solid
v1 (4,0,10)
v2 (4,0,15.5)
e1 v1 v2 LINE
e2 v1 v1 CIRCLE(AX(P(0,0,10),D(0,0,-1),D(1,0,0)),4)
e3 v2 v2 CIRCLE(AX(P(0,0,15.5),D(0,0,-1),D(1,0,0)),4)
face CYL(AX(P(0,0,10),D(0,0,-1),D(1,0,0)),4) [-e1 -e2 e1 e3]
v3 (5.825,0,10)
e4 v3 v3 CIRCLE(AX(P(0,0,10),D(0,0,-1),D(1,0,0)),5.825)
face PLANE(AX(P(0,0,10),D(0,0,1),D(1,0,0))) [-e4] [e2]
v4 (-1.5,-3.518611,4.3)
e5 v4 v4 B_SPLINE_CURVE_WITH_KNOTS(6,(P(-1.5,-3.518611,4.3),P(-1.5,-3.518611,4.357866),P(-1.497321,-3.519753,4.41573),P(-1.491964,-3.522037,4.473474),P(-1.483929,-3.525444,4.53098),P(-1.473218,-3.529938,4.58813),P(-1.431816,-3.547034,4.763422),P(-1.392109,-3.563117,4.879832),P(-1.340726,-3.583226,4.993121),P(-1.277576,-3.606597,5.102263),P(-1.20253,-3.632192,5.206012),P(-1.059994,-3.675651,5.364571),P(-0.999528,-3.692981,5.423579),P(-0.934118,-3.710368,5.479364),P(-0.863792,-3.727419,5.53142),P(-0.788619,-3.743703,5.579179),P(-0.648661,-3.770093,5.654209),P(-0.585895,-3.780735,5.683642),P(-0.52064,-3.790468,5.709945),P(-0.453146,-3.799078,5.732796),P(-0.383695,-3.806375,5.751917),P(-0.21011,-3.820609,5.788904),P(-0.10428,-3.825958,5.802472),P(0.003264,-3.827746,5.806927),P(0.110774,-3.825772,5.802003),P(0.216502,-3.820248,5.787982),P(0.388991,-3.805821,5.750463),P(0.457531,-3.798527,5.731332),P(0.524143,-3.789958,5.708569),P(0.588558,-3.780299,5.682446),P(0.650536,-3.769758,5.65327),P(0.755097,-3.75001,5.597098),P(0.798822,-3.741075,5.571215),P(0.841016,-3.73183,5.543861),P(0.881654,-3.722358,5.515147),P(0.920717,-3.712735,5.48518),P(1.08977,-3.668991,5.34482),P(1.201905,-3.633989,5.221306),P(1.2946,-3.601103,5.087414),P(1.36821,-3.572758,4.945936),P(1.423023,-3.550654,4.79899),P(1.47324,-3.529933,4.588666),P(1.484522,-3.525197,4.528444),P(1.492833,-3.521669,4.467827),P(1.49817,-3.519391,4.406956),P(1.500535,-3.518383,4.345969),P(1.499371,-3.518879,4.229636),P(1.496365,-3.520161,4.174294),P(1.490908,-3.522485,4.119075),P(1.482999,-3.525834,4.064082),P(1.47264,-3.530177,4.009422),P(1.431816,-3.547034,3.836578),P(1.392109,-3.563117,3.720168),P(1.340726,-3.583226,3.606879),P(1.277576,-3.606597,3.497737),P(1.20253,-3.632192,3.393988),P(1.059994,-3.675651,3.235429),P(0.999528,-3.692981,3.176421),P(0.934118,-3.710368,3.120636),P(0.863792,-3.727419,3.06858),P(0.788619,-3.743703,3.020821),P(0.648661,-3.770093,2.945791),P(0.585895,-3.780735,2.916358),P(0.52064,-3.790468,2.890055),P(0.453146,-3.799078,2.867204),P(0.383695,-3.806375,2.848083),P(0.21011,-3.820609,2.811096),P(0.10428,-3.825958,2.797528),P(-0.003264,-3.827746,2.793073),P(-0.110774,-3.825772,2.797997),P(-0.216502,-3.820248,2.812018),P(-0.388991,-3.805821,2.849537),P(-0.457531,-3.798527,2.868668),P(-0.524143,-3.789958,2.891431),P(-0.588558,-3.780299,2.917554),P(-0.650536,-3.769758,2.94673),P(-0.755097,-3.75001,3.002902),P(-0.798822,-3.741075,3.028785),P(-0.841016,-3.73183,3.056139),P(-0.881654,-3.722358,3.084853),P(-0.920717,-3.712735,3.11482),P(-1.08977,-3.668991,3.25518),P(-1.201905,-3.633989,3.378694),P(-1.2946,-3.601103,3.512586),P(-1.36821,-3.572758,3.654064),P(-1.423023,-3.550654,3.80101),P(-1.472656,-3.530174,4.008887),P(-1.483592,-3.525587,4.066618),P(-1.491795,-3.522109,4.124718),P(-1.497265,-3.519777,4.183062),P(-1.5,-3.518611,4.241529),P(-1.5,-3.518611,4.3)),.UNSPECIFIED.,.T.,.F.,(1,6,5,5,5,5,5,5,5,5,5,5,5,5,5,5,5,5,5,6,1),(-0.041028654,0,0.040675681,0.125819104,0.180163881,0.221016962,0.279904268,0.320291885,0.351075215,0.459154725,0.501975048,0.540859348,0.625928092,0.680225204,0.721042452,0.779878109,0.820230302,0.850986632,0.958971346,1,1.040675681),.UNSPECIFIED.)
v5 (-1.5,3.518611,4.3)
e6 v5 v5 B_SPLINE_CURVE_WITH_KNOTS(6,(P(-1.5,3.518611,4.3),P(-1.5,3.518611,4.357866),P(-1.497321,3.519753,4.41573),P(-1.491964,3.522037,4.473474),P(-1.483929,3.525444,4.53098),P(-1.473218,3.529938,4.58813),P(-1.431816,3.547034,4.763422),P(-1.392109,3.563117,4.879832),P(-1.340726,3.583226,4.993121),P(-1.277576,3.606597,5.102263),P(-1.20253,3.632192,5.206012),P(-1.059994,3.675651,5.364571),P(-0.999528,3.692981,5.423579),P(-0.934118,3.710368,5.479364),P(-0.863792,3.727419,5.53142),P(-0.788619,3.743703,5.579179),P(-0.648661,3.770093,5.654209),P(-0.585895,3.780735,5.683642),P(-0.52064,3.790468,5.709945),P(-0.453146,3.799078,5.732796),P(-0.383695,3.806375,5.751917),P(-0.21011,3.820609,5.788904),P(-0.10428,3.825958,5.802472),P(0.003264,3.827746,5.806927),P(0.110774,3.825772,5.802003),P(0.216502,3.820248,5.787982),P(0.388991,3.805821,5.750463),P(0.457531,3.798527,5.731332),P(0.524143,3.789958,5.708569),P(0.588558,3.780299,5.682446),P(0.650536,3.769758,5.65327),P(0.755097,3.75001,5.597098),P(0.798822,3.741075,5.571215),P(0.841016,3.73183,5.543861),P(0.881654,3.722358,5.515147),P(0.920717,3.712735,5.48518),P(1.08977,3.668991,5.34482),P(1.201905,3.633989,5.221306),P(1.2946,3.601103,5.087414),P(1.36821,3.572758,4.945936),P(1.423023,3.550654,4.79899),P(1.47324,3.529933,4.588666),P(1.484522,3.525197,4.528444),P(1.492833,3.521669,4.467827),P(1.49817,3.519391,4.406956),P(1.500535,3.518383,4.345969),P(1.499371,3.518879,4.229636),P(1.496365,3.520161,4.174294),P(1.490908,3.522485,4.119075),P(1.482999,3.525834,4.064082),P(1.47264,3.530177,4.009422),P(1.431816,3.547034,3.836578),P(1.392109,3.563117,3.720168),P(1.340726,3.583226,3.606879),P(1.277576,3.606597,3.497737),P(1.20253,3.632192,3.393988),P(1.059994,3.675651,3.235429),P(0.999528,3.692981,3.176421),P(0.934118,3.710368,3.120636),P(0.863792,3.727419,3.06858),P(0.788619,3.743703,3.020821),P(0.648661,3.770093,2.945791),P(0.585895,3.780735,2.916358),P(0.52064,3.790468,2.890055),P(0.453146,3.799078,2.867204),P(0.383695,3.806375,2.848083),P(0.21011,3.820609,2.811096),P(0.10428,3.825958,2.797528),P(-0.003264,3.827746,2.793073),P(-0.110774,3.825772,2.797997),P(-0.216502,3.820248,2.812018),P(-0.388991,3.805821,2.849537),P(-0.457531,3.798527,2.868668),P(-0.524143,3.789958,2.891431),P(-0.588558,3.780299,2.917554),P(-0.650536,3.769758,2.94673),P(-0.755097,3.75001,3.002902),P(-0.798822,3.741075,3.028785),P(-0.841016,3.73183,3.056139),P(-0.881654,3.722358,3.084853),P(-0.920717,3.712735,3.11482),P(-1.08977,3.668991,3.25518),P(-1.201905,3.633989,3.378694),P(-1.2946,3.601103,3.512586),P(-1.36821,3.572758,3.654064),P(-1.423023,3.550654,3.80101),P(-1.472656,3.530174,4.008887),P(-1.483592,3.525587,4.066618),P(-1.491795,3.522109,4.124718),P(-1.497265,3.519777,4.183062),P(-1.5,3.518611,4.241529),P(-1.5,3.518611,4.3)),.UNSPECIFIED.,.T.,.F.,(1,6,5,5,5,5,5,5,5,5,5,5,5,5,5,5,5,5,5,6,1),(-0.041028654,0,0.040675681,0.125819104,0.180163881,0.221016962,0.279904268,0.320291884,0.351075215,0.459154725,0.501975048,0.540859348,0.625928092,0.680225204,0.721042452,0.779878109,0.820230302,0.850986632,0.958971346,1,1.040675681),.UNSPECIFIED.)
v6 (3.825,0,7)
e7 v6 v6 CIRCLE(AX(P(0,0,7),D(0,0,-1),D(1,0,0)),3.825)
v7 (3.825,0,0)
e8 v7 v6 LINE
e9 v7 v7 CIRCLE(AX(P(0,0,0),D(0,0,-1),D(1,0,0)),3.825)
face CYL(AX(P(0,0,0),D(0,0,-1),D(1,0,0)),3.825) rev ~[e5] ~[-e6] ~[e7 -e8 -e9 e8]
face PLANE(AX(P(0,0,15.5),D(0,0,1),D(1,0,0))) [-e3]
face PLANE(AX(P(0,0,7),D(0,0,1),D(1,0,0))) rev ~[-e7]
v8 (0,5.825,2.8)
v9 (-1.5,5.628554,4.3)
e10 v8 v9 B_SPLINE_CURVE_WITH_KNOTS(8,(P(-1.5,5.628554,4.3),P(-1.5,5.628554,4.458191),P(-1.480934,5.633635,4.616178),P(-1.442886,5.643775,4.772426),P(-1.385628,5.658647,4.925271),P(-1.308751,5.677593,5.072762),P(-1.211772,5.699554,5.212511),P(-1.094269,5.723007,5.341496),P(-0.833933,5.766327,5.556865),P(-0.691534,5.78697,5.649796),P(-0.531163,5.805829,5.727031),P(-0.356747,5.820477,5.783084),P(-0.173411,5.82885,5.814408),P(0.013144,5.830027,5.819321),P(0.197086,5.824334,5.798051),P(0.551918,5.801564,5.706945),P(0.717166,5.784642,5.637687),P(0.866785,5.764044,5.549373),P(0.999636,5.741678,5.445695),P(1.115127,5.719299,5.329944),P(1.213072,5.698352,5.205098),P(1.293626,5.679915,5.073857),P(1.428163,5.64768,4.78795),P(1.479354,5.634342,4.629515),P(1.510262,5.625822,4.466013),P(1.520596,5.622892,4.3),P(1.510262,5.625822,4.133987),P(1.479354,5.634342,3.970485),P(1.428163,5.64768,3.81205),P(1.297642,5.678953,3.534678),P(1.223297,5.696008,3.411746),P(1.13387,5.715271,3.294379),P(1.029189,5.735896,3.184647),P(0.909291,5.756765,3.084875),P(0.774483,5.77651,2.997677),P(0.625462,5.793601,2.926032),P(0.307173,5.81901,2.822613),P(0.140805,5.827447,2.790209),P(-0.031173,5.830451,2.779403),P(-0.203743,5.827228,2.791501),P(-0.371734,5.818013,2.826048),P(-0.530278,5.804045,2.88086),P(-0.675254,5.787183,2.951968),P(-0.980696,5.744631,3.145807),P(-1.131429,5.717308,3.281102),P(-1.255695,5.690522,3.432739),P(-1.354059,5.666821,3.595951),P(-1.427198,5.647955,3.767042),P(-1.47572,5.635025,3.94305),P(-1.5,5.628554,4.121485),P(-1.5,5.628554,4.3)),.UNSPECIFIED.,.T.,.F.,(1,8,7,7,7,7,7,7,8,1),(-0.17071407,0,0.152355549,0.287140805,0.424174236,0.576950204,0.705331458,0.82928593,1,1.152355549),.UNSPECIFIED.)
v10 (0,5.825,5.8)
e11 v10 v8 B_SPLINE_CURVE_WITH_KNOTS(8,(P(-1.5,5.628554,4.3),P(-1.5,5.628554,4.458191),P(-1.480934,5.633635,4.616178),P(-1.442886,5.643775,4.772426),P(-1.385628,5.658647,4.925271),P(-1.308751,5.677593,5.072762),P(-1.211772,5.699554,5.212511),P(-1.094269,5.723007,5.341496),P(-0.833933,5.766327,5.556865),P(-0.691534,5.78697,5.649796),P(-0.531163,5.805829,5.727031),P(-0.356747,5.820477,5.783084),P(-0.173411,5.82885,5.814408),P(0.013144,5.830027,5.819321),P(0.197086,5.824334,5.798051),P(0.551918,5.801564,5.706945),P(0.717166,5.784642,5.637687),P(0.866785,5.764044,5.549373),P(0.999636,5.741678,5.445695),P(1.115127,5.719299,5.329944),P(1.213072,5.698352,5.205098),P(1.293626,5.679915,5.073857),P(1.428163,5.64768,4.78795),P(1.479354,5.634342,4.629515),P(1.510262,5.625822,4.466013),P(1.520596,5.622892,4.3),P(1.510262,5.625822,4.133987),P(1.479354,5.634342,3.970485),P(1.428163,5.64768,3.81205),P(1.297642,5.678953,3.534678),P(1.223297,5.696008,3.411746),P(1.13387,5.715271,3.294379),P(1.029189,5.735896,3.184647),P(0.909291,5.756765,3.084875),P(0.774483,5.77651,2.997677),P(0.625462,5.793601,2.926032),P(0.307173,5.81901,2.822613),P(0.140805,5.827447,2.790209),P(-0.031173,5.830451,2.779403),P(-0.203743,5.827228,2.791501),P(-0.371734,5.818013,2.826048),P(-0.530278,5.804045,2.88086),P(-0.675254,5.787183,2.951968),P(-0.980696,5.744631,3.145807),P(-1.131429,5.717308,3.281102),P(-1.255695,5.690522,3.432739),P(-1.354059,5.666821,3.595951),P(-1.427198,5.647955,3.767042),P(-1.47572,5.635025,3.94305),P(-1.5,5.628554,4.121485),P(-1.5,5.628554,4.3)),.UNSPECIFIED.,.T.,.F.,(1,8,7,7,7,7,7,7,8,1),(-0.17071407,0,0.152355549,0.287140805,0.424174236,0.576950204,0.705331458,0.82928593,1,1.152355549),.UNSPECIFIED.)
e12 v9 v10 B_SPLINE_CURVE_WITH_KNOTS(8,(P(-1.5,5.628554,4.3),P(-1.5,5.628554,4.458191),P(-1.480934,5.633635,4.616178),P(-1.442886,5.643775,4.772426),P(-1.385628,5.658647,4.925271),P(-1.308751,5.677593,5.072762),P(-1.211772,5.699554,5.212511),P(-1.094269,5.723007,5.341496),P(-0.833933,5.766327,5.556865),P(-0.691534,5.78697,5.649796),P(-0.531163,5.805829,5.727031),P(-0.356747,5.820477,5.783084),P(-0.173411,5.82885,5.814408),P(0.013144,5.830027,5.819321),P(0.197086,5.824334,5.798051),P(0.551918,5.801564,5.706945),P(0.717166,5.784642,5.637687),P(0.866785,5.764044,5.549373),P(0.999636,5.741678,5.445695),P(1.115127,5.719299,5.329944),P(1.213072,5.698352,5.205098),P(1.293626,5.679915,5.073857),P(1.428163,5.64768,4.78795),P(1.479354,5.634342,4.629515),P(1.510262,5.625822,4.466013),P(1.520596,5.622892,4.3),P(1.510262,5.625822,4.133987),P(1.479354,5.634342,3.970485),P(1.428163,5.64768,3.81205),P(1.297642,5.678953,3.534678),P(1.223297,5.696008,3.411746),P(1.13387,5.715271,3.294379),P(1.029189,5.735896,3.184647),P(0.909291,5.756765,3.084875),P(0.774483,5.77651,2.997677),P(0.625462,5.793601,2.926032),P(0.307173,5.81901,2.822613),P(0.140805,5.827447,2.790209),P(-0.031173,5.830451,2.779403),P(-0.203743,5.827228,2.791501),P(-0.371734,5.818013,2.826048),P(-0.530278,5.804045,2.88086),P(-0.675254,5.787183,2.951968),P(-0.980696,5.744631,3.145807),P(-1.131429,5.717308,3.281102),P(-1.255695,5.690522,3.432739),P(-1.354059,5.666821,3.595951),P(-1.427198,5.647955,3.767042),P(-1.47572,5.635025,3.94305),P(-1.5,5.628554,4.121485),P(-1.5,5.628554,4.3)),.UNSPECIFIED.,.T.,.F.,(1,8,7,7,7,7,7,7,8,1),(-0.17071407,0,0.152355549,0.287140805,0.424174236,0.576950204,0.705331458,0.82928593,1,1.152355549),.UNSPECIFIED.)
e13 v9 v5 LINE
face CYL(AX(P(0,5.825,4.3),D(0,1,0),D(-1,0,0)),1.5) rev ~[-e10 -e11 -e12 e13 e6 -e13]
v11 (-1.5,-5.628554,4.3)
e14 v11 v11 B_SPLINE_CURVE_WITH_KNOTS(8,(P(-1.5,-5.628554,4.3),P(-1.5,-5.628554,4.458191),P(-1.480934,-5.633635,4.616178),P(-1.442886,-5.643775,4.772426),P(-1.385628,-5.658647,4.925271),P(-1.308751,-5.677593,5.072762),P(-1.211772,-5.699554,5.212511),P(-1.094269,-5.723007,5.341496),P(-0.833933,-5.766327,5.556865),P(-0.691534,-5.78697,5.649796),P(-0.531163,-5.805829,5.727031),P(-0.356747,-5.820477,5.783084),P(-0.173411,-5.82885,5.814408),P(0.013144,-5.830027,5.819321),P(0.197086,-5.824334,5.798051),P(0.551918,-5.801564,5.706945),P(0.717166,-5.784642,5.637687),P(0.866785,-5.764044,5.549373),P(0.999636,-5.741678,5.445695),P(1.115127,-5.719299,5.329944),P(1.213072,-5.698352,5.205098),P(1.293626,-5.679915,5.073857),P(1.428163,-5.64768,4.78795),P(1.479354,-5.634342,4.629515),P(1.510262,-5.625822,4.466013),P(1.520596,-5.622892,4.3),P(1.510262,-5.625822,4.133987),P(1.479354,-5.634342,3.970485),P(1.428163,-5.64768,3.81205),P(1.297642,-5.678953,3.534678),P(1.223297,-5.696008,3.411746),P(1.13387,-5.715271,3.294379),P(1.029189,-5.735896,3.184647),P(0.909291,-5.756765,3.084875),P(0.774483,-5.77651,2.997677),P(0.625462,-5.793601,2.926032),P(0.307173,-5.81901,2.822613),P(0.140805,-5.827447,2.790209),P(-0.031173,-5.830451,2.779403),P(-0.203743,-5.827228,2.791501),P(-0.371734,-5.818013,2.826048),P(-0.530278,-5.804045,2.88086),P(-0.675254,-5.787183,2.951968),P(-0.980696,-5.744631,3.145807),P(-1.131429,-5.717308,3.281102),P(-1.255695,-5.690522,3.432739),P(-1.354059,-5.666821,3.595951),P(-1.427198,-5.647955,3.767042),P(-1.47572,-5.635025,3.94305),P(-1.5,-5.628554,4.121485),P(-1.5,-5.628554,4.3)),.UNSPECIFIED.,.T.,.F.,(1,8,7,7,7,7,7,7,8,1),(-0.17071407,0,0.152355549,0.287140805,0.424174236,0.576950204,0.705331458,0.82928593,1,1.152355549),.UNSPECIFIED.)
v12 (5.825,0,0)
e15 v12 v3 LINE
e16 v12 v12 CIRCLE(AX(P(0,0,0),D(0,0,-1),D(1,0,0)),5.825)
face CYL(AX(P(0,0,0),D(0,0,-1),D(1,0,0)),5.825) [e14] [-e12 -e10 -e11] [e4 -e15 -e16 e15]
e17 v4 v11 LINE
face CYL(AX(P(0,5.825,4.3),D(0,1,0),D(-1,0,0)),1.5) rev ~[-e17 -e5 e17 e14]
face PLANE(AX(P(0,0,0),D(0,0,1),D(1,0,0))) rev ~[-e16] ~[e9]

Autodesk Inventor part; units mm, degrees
ref_plane "YZ Plane" through (0, 0, 0) normal (1, 0, 0) x (0, 1, 0)
ref_plane "XZ Plane" through (0, 0, 0) normal (0, 1, 0) x (-1, 0, 0)
sketch "Sketch1" plane through (0, 0, 0) normal (0, 0, 1) x (1, 0, 0)
  circle A0 centre (0, 0) radius 3.825
  circle A1 centre (0, 0) radius 5.825
  dimension "d0" = 7.65
  dimension "d1" = 2
extrude "Extrusion1" add sketch "Sketch1" along normal blind 10
sketch "Sketch2" plane through (0, 0, 10) normal (0, 0, 1) x (1, 0, 0)
  circle A0 centre (0, 0) radius 4
  dimension "d4" = 8
extrude "Extrusion2" add sketch "Sketch2" along normal mid plane 6
move faces "Move1" translate (0, 0, 2.5) faces at (0.7574, 1.0973, 13)
sketch "Sketch3" plane through (0, 0, 0) normal (0, 0, -1) x (-1, 0, 0)
  line L0 (0, 0) -> (0, 5.825)
  circle A0 centre (0, 0) radius 5.825 projected
ref_plane "Work Plane1" through (0, 5.825, 0) normal (0, 1, 0) x (-1, 0, 0)
sketch "Sketch4" plane through (0, 5.825, 0) normal (0, 1, 0) x (-1, 0, 0)
  circle A0 centre (0, 4.3) radius 1.5
  point P0 (0, 0)
  dimension "d10" = 3
  dimension "d11" = 4.3
extrude "Extrusion3" cut sketch "Sketch4" against normal through all
properties part number "shaft_extension2"
